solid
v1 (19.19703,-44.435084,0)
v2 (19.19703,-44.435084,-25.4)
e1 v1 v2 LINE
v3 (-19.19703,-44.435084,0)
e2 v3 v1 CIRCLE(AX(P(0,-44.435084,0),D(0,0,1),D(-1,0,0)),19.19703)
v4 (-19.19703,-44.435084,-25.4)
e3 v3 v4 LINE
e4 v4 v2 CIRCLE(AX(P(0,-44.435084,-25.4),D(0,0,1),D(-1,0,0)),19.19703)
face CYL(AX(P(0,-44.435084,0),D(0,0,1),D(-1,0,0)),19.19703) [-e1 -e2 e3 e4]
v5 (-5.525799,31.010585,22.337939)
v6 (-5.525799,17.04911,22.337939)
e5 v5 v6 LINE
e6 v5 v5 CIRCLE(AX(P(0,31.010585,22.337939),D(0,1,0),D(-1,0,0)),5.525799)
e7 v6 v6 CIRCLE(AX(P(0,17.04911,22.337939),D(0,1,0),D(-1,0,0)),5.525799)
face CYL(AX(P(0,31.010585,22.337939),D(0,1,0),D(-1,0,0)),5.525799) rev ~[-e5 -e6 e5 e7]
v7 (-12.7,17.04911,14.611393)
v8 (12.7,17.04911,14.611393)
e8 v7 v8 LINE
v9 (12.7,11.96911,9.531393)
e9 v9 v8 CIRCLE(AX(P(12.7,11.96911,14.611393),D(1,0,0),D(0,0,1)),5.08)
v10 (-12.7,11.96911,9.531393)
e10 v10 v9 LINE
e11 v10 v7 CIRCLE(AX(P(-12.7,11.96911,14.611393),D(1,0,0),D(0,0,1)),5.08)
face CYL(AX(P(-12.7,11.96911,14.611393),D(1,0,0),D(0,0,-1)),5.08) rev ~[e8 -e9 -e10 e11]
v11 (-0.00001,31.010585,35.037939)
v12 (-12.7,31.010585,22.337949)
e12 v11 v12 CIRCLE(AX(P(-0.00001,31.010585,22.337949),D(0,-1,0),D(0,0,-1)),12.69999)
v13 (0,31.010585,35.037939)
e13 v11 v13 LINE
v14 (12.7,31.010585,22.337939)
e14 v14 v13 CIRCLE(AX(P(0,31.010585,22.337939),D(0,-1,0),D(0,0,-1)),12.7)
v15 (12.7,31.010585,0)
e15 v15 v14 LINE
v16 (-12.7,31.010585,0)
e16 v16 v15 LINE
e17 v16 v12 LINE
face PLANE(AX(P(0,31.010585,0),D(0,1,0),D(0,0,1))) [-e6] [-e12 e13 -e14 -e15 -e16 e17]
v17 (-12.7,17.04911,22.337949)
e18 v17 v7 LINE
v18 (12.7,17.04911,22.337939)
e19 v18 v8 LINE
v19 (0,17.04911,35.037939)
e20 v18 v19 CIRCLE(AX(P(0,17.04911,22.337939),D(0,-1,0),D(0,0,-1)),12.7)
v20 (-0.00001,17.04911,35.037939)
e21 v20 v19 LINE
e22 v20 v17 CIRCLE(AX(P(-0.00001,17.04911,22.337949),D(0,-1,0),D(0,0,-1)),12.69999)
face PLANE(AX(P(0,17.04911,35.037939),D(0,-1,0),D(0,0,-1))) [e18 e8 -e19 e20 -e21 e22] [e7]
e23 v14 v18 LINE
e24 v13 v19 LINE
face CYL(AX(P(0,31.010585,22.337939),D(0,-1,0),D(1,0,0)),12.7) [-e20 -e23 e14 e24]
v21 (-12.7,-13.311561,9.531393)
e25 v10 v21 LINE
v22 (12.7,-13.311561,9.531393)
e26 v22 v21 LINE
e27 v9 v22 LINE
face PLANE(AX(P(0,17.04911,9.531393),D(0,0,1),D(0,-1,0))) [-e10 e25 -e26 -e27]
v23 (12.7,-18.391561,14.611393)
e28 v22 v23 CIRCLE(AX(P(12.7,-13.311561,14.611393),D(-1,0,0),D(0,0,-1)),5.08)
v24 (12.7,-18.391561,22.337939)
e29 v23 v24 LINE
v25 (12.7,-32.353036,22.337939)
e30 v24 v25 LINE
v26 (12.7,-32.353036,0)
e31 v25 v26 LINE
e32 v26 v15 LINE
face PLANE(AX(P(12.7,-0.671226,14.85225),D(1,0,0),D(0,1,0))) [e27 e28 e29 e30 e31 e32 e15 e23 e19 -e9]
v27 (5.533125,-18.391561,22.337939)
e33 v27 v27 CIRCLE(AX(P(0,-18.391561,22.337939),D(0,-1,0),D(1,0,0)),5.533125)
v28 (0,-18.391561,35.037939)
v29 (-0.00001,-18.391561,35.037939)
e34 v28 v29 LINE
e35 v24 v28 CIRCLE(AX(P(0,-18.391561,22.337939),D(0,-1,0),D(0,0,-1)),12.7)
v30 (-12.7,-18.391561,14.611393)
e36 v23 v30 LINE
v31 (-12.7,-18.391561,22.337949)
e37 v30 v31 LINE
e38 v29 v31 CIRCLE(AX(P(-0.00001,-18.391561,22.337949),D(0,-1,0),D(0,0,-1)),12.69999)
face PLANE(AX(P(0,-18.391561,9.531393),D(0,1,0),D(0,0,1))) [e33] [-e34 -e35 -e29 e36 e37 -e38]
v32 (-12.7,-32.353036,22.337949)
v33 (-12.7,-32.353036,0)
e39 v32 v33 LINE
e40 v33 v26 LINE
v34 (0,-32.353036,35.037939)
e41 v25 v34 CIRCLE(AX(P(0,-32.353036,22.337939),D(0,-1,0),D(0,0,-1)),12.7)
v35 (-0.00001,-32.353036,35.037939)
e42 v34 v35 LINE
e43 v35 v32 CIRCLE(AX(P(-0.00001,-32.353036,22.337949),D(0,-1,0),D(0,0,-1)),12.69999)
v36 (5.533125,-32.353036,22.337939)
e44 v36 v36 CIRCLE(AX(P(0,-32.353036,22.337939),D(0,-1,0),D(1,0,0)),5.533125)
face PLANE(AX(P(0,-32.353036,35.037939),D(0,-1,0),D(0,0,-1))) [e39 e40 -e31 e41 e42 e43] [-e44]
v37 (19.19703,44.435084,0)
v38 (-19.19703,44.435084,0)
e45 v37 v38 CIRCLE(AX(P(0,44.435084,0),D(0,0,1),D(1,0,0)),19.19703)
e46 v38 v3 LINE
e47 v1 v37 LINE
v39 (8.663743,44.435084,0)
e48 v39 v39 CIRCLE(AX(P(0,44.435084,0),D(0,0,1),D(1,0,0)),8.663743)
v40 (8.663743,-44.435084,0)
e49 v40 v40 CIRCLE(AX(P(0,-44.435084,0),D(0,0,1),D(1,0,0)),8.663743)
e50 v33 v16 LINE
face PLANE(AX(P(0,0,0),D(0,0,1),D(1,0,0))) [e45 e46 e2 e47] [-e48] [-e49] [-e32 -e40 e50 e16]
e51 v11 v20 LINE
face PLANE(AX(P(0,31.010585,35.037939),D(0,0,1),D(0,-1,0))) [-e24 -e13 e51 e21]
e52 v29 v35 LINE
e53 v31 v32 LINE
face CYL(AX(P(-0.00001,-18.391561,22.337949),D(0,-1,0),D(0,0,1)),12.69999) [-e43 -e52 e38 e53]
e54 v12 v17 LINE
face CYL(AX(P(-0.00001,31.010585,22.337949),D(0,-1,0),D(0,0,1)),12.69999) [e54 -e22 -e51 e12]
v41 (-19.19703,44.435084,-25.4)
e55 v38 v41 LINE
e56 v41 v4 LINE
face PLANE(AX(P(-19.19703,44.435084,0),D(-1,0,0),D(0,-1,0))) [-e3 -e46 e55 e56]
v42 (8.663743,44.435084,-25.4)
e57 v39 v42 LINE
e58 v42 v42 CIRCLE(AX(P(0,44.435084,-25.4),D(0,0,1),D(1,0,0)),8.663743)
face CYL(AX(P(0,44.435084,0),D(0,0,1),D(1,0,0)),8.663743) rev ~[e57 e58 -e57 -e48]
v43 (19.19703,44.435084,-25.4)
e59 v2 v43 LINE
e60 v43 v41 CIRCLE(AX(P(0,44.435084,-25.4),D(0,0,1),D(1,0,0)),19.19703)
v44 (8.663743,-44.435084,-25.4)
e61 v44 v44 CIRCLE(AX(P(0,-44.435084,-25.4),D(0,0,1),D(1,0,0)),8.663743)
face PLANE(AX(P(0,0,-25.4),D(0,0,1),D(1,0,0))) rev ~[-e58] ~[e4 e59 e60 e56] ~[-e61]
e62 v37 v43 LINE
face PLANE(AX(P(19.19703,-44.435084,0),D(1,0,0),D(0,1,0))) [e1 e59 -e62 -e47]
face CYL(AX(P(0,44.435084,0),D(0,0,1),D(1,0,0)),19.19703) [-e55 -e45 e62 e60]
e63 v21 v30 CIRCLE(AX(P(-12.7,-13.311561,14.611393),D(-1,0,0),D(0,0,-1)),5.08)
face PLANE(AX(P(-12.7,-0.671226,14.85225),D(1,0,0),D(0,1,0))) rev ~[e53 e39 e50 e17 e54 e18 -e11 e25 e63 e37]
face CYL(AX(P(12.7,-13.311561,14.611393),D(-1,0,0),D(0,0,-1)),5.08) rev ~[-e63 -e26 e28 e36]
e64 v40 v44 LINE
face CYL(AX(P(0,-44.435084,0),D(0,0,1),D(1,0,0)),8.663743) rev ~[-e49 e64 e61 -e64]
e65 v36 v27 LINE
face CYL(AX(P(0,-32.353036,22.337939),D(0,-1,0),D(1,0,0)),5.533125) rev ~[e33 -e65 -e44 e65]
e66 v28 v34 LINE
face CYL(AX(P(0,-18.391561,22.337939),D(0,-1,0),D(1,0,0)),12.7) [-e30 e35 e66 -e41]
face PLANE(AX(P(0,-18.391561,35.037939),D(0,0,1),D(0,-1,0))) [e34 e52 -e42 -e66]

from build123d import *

# Parameters (mm, degrees)
F0_R      = 8.6637425689
F1_DEPTH  = 25.4
F3_DEPTH  = 12.7
F4_R      = 5.08
F5_R      = 5.08
F6_R      = 12.7
F7_R      = 12.69999
F8_R      = 12.7
F9_R      = 12.69999
F10_R     = 5.5257991494
F11_DEPTH = 25.4
F12_R     = 5.5331253453
F13_DEPTH = 25.4


# Not quite as in the source:
# - a fillet or chamfer is up to 0.001 mm smaller than in the source, because OpenCascade refuses the exact size


with BuildPart() as f1:
    # F0 (on Top) → F1 (new body)
    with BuildSketch(Plane.XY):
        with BuildLine():
            ThreePointArc((19.1970299929, 44.4350838661), (0, 63.6321138591), (-19.1970299929, 44.4350838661))
            Line((-19.1970299929, 44.4350838661), (-19.1970299929, -44.4350838661))
            ThreePointArc((-19.1970299929, -44.4350838661), (0, -63.6321138591), (19.1970299929, -44.4350838661))
            Line((19.1970299929, -44.4350838661), (19.1970299929, 44.4350838661))
        make_face()
        with Locations((0, -44.4350838661)):
            Circle(F0_R, mode=Mode.SUBTRACT)
        with Locations((0, 44.4350838661)):
            Circle(F0_R, mode=Mode.SUBTRACT)
    extrude(amount=-F1_DEPTH)

    # F2 (on Right) → F3 (join, symmetric)
    with BuildSketch(Plane.YZ):
        Polygon((-32.3530361056, 35.0379385054), (-32.3530361056, 0), (31.0105849057, 0), (31.0105849057, 35.0379385054), (17.0491095632, 35.0379385054), (17.0491095632, 9.5313927159), (-18.3915607631, 9.5313927159), (-18.3915607631, 35.0379385054), align=None)
    extrude(amount=F3_DEPTH, both=True)

    # F4
    f4_edges = [f1.edges().sort_by_distance(p)[0] for p in [
        (0, -18.391561, 9.531393),
    ]]
    fillet(f4_edges, radius=F4_R)

    # F5
    f5_edges = [f1.edges().sort_by_distance(p)[0] for p in [
        (0, 17.04911, 9.531393),
    ]]
    fillet(f5_edges, radius=F5_R)

    # F6
    f6_edges = [f1.edges().sort_by_distance(p)[0] for p in [
        (12.7, -25.372298, 35.037939),
    ]]
    fillet(f6_edges, radius=F6_R)

    # F7 (radius 12.7 in the source; OpenCascade refuses exactly that, so slightly less here)
    f7_edges = [f1.edges().sort_by_distance(p)[0] for p in [
        (-12.7, -25.372298, 35.037939),
    ]]
    fillet(f7_edges, radius=F7_R)

    # F8
    f8_edges = [f1.edges().sort_by_distance(p)[0] for p in [
        (12.7, 24.029847, 35.037939),
    ]]
    fillet(f8_edges, radius=F8_R)

    # F9 (radius 12.7 in the source; OpenCascade refuses exactly that, so slightly less here)
    f9_edges = [f1.edges().sort_by_distance(p)[0] for p in [
        (-12.7, 24.029847, 35.037939),
    ]]
    fillet(f9_edges, radius=F9_R)

    # F10 (on face) → F11 (cut)
    with BuildSketch(Plane(origin=(0, 31.0105849057, 0), x_dir=(-1, 0, 0), z_dir=(0, 1, 0))):
        with Locations((0, 22.3379385054)):
            Circle(F10_R)
    extrude(amount=-F11_DEPTH, mode=Mode.SUBTRACT)

    # F12 (on face) → F13 (cut)
    with BuildSketch(Plane.XZ.offset(32.3530361056)):
        with Locations((0, 22.3379385054)):
            Circle(F12_R)
    extrude(amount=-F13_DEPTH, mode=Mode.SUBTRACT)


solid = f1.part
